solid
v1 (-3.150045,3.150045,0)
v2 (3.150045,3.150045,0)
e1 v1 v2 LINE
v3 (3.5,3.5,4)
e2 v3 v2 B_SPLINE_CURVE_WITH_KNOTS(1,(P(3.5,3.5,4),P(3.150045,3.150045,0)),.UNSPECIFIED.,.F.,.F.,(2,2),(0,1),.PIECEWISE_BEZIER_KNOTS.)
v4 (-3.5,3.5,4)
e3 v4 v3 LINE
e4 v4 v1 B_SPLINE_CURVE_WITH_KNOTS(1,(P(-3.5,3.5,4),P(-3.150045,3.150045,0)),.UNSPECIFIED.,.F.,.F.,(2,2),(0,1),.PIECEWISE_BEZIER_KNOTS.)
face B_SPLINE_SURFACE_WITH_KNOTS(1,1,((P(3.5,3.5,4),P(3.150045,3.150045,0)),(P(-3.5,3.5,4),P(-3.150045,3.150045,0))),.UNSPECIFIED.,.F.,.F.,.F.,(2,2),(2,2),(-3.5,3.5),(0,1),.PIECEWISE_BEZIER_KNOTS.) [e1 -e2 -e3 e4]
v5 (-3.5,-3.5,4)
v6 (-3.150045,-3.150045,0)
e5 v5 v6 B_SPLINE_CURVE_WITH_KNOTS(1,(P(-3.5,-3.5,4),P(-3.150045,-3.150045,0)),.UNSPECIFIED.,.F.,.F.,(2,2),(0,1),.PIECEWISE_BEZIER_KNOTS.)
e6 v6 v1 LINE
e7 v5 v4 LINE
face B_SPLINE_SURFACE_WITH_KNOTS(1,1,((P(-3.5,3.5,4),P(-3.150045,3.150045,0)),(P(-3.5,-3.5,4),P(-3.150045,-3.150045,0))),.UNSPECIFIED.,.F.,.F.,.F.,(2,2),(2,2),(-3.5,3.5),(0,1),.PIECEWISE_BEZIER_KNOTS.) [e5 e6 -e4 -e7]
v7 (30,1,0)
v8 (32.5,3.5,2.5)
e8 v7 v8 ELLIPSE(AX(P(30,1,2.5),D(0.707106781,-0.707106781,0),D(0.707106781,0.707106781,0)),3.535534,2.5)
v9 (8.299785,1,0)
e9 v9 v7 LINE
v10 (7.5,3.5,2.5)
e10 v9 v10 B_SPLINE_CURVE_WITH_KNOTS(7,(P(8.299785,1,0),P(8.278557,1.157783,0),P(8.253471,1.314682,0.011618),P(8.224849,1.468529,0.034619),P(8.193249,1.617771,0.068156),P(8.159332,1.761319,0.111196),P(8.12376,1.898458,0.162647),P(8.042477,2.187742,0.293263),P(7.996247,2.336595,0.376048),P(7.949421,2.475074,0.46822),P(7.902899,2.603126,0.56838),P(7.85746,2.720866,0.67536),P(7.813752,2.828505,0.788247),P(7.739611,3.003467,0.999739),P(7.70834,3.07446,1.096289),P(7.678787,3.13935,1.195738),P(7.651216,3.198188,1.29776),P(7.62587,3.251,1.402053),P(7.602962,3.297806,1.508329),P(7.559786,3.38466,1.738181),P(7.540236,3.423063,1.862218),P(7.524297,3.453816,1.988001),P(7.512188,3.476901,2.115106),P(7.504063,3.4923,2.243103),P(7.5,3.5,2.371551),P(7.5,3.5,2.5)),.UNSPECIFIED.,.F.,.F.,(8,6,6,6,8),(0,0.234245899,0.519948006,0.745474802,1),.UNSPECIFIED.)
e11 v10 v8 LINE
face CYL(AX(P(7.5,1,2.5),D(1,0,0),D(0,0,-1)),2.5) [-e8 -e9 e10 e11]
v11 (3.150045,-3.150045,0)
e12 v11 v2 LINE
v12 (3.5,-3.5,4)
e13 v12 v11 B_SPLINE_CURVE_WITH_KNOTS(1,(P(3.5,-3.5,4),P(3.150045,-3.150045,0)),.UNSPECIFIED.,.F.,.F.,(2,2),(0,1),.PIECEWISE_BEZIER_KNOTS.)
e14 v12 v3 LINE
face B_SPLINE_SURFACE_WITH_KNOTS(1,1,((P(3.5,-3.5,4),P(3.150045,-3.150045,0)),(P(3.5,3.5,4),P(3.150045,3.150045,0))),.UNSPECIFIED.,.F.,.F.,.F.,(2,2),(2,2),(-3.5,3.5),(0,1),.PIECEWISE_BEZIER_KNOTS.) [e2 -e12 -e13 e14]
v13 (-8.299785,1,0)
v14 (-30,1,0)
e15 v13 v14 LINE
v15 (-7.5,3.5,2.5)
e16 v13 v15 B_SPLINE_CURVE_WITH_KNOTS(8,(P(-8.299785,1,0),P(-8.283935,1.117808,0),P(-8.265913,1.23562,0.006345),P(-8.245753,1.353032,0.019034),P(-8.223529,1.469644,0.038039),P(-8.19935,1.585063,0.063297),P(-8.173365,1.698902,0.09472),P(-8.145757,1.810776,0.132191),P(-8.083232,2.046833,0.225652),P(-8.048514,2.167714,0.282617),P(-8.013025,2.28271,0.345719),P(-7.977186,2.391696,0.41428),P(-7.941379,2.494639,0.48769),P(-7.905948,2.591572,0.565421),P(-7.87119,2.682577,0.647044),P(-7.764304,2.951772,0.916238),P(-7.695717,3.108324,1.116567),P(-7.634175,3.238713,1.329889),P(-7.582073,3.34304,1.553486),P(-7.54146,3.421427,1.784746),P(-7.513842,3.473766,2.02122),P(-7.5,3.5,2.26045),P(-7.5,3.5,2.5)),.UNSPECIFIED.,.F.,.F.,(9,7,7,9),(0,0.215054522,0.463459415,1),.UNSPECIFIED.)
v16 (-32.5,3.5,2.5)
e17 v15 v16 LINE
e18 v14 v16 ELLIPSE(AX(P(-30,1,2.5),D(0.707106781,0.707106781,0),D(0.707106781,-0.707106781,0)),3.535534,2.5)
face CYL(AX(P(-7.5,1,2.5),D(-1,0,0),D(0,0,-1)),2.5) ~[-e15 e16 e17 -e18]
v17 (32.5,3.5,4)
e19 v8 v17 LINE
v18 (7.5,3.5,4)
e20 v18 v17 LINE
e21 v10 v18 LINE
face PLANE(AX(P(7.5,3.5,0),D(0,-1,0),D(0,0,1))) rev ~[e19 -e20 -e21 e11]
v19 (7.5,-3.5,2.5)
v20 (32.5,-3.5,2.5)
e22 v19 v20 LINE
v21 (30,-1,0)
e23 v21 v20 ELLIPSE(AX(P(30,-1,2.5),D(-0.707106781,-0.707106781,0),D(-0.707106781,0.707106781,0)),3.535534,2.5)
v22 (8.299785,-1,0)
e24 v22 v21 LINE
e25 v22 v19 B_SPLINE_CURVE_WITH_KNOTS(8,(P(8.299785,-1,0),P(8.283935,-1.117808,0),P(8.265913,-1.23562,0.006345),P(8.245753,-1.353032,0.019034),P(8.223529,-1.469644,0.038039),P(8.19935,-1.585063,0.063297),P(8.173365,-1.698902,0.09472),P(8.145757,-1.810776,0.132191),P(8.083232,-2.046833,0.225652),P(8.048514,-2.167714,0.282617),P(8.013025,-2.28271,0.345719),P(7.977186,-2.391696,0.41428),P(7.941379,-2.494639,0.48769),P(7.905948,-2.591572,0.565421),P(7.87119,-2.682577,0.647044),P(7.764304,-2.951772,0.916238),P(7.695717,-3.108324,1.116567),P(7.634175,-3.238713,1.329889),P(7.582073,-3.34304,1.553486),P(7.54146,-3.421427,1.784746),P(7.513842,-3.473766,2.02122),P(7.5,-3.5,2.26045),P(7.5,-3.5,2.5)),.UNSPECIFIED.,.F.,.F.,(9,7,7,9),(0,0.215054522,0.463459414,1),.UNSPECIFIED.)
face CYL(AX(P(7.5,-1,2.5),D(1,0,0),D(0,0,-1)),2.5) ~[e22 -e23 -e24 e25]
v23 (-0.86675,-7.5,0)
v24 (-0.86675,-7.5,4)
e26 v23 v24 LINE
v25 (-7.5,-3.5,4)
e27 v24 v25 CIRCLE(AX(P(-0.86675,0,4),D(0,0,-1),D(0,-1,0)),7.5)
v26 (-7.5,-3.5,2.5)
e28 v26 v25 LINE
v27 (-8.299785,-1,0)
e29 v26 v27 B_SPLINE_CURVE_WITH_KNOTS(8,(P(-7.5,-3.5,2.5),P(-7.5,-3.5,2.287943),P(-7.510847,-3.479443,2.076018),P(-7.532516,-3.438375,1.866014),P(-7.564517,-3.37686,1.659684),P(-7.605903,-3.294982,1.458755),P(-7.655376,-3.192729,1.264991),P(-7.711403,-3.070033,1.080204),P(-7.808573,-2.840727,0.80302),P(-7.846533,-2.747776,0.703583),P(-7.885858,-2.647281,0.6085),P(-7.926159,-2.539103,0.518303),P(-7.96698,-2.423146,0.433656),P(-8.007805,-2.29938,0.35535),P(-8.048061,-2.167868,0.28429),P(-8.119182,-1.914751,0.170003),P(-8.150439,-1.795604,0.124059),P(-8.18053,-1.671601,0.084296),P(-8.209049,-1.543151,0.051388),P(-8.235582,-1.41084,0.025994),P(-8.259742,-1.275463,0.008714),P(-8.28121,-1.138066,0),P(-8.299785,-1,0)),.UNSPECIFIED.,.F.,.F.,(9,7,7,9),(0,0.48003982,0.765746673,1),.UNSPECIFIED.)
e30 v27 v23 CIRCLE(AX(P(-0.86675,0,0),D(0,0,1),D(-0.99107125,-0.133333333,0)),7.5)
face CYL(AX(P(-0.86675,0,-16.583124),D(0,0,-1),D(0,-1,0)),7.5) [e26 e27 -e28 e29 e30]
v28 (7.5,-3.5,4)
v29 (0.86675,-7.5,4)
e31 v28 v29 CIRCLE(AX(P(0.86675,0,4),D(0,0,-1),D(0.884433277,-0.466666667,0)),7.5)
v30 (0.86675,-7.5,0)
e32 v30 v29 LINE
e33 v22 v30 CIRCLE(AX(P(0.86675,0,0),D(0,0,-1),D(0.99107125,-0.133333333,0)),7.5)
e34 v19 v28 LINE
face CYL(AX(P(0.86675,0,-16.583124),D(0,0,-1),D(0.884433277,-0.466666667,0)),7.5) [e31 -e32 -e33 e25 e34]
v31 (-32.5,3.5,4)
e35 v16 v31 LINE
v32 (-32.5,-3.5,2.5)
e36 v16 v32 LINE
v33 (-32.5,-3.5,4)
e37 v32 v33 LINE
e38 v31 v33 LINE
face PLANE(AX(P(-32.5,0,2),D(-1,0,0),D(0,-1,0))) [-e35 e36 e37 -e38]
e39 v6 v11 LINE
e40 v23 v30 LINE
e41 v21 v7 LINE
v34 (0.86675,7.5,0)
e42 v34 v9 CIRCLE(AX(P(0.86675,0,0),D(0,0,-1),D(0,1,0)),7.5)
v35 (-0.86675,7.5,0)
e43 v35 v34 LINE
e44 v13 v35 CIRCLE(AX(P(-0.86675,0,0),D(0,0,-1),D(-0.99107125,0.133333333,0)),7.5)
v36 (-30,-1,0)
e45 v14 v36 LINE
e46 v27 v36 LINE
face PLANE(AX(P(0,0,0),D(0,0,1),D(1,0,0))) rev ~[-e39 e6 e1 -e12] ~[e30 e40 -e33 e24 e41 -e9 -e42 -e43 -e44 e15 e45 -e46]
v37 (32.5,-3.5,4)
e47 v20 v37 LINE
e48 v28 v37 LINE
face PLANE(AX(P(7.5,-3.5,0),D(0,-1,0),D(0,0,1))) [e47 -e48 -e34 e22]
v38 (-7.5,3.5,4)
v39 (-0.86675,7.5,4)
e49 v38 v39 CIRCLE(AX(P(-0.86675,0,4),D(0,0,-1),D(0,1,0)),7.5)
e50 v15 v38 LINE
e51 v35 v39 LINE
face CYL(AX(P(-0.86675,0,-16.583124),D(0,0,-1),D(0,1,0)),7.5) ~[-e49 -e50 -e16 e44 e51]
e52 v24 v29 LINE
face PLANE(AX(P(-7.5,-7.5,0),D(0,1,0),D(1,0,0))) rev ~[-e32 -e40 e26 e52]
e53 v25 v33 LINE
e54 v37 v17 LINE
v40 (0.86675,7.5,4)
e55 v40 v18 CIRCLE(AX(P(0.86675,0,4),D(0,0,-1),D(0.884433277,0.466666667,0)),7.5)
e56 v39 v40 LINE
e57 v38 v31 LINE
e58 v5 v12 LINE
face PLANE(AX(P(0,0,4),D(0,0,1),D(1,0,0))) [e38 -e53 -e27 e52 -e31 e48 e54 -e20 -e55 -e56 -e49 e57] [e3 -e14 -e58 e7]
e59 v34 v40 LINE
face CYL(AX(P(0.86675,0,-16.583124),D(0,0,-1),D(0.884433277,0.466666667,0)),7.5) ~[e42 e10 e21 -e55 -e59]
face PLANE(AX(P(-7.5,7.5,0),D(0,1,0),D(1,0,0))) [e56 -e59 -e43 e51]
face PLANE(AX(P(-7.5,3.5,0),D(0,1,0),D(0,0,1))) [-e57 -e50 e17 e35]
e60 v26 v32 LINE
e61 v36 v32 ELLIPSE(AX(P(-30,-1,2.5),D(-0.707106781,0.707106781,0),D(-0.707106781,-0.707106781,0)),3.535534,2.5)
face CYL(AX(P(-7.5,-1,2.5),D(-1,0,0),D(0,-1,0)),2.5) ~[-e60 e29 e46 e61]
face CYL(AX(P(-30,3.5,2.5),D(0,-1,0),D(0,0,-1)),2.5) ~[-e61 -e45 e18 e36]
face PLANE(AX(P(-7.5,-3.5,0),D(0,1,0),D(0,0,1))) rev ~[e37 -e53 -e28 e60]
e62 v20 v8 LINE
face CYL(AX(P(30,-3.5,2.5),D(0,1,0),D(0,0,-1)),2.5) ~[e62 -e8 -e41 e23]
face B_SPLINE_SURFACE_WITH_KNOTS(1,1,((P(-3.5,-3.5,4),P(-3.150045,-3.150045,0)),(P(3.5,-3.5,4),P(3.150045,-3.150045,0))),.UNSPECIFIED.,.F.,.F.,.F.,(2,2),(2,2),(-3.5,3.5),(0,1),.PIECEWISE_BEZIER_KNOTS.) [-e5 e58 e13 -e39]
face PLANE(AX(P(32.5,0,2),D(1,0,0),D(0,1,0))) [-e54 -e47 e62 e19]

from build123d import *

# Parameters (mm, degrees)
F0_W        = 15
F0_H        = 15
F0_W_2      = 7
F0_H_2      = 7
F1_DEPTH    = 4
F2_W        = 7
F2_H        = 7
F3_DEPTH    = 4
F3_TAPER    = 5
F4_W        = 7
F4_H        = 4
F5_DEPTH    = 25
F6_W        = 7
F6_H        = 4
F7_DEPTH    = 25
F8_T1_DEPTH = 37.1662479036
F9_R        = 2.5


# Not quite as in the source:
# - a fillet or chamfer that OpenCascade refuses, or shapes differently, is made with other operations: its cross-section is extruded or revolved along the edge and cut away or added


with BuildPart() as f1:
    # F0 (on Top) → F1 (new body)
    with BuildSketch(Plane.XY):
        Rectangle(F0_W, F0_H)
        Rectangle(F0_W_2, F0_H_2, mode=Mode.SUBTRACT)
        Rectangle(F0_W_2, F0_H_2)
    extrude(amount=F1_DEPTH)

    # F2 (on face) → F3 (cut)
    with BuildSketch(Plane.XY.offset(4)):
        Rectangle(F2_W, F2_H)
    extrude(amount=-F3_DEPTH, taper=F3_TAPER, mode=Mode.SUBTRACT)

    # F4 (on face) → F5 (join)
    with BuildSketch(Plane.YZ.offset(7.5)):
        with Locations((0, 2)):
            Rectangle(F4_W, F4_H)
    extrude(amount=F5_DEPTH)

    # F6 (on face) → F7 (join)
    with BuildSketch(Plane(origin=(-7.5, 0, 0), x_dir=(0, -1, 0), z_dir=(-1, 0, 0))):
        with Locations((0, 2)):
            Rectangle(F6_W, F6_H)
    extrude(amount=F7_DEPTH)

    # F8: fillet of radius 7.5 on 4 edges, made by hand

    # F8_s2 → F8_t1 (cut)
    with BuildSketch(Plane.XY.offset(-16.5831239518)):
        with BuildLine():
            ThreePointArc((-0.8667504193, 7.5), (-4.7397337655, 6.4226162893), (-7.5, 3.5))
            Line((-7.5, 3.5), (-7.5, 7.5))
            Line((-7.5, 7.5), (-0.8667504193, 7.5))
        make_face()
        with BuildLine():
            ThreePointArc((7.5, 3.5), (4.7397337655, 6.4226162893), (0.8667504193, 7.5))
            Line((0.8667504193, 7.5), (7.5, 7.5))
            Line((7.5, 7.5), (7.5, 3.5))
        make_face()
        with BuildLine():
            ThreePointArc((7.5, -3.5), (4.7397337655, -6.4226162893), (0.8667504193, -7.5))
            Line((0.8667504193, -7.5), (7.5, -7.5))
            Line((7.5, -7.5), (7.5, -3.5))
        make_face()
        with BuildLine():
            ThreePointArc((-0.8667504193, -7.5), (-4.7397337655, -6.4226162893), (-7.5, -3.5))
            Line((-7.5, -3.5), (-7.5, -7.5))
            Line((-7.5, -7.5), (-0.8667504193, -7.5))
        make_face()
    extrude(amount=F8_T1_DEPTH, mode=Mode.SUBTRACT)

    # F9
    f9_edges = [f1.edges().sort_by_distance(p)[0] for p in [
        (-32.5, 0, 0),
        (-20, -3.5, 0),
        (-20, 3.5, 0),
        (20, 3.5, 0),
        (32.5, 0, 0),
        (20, -3.5, 0),
    ]]
    fillet(f9_edges, radius=F9_R)


solid = f1.part
